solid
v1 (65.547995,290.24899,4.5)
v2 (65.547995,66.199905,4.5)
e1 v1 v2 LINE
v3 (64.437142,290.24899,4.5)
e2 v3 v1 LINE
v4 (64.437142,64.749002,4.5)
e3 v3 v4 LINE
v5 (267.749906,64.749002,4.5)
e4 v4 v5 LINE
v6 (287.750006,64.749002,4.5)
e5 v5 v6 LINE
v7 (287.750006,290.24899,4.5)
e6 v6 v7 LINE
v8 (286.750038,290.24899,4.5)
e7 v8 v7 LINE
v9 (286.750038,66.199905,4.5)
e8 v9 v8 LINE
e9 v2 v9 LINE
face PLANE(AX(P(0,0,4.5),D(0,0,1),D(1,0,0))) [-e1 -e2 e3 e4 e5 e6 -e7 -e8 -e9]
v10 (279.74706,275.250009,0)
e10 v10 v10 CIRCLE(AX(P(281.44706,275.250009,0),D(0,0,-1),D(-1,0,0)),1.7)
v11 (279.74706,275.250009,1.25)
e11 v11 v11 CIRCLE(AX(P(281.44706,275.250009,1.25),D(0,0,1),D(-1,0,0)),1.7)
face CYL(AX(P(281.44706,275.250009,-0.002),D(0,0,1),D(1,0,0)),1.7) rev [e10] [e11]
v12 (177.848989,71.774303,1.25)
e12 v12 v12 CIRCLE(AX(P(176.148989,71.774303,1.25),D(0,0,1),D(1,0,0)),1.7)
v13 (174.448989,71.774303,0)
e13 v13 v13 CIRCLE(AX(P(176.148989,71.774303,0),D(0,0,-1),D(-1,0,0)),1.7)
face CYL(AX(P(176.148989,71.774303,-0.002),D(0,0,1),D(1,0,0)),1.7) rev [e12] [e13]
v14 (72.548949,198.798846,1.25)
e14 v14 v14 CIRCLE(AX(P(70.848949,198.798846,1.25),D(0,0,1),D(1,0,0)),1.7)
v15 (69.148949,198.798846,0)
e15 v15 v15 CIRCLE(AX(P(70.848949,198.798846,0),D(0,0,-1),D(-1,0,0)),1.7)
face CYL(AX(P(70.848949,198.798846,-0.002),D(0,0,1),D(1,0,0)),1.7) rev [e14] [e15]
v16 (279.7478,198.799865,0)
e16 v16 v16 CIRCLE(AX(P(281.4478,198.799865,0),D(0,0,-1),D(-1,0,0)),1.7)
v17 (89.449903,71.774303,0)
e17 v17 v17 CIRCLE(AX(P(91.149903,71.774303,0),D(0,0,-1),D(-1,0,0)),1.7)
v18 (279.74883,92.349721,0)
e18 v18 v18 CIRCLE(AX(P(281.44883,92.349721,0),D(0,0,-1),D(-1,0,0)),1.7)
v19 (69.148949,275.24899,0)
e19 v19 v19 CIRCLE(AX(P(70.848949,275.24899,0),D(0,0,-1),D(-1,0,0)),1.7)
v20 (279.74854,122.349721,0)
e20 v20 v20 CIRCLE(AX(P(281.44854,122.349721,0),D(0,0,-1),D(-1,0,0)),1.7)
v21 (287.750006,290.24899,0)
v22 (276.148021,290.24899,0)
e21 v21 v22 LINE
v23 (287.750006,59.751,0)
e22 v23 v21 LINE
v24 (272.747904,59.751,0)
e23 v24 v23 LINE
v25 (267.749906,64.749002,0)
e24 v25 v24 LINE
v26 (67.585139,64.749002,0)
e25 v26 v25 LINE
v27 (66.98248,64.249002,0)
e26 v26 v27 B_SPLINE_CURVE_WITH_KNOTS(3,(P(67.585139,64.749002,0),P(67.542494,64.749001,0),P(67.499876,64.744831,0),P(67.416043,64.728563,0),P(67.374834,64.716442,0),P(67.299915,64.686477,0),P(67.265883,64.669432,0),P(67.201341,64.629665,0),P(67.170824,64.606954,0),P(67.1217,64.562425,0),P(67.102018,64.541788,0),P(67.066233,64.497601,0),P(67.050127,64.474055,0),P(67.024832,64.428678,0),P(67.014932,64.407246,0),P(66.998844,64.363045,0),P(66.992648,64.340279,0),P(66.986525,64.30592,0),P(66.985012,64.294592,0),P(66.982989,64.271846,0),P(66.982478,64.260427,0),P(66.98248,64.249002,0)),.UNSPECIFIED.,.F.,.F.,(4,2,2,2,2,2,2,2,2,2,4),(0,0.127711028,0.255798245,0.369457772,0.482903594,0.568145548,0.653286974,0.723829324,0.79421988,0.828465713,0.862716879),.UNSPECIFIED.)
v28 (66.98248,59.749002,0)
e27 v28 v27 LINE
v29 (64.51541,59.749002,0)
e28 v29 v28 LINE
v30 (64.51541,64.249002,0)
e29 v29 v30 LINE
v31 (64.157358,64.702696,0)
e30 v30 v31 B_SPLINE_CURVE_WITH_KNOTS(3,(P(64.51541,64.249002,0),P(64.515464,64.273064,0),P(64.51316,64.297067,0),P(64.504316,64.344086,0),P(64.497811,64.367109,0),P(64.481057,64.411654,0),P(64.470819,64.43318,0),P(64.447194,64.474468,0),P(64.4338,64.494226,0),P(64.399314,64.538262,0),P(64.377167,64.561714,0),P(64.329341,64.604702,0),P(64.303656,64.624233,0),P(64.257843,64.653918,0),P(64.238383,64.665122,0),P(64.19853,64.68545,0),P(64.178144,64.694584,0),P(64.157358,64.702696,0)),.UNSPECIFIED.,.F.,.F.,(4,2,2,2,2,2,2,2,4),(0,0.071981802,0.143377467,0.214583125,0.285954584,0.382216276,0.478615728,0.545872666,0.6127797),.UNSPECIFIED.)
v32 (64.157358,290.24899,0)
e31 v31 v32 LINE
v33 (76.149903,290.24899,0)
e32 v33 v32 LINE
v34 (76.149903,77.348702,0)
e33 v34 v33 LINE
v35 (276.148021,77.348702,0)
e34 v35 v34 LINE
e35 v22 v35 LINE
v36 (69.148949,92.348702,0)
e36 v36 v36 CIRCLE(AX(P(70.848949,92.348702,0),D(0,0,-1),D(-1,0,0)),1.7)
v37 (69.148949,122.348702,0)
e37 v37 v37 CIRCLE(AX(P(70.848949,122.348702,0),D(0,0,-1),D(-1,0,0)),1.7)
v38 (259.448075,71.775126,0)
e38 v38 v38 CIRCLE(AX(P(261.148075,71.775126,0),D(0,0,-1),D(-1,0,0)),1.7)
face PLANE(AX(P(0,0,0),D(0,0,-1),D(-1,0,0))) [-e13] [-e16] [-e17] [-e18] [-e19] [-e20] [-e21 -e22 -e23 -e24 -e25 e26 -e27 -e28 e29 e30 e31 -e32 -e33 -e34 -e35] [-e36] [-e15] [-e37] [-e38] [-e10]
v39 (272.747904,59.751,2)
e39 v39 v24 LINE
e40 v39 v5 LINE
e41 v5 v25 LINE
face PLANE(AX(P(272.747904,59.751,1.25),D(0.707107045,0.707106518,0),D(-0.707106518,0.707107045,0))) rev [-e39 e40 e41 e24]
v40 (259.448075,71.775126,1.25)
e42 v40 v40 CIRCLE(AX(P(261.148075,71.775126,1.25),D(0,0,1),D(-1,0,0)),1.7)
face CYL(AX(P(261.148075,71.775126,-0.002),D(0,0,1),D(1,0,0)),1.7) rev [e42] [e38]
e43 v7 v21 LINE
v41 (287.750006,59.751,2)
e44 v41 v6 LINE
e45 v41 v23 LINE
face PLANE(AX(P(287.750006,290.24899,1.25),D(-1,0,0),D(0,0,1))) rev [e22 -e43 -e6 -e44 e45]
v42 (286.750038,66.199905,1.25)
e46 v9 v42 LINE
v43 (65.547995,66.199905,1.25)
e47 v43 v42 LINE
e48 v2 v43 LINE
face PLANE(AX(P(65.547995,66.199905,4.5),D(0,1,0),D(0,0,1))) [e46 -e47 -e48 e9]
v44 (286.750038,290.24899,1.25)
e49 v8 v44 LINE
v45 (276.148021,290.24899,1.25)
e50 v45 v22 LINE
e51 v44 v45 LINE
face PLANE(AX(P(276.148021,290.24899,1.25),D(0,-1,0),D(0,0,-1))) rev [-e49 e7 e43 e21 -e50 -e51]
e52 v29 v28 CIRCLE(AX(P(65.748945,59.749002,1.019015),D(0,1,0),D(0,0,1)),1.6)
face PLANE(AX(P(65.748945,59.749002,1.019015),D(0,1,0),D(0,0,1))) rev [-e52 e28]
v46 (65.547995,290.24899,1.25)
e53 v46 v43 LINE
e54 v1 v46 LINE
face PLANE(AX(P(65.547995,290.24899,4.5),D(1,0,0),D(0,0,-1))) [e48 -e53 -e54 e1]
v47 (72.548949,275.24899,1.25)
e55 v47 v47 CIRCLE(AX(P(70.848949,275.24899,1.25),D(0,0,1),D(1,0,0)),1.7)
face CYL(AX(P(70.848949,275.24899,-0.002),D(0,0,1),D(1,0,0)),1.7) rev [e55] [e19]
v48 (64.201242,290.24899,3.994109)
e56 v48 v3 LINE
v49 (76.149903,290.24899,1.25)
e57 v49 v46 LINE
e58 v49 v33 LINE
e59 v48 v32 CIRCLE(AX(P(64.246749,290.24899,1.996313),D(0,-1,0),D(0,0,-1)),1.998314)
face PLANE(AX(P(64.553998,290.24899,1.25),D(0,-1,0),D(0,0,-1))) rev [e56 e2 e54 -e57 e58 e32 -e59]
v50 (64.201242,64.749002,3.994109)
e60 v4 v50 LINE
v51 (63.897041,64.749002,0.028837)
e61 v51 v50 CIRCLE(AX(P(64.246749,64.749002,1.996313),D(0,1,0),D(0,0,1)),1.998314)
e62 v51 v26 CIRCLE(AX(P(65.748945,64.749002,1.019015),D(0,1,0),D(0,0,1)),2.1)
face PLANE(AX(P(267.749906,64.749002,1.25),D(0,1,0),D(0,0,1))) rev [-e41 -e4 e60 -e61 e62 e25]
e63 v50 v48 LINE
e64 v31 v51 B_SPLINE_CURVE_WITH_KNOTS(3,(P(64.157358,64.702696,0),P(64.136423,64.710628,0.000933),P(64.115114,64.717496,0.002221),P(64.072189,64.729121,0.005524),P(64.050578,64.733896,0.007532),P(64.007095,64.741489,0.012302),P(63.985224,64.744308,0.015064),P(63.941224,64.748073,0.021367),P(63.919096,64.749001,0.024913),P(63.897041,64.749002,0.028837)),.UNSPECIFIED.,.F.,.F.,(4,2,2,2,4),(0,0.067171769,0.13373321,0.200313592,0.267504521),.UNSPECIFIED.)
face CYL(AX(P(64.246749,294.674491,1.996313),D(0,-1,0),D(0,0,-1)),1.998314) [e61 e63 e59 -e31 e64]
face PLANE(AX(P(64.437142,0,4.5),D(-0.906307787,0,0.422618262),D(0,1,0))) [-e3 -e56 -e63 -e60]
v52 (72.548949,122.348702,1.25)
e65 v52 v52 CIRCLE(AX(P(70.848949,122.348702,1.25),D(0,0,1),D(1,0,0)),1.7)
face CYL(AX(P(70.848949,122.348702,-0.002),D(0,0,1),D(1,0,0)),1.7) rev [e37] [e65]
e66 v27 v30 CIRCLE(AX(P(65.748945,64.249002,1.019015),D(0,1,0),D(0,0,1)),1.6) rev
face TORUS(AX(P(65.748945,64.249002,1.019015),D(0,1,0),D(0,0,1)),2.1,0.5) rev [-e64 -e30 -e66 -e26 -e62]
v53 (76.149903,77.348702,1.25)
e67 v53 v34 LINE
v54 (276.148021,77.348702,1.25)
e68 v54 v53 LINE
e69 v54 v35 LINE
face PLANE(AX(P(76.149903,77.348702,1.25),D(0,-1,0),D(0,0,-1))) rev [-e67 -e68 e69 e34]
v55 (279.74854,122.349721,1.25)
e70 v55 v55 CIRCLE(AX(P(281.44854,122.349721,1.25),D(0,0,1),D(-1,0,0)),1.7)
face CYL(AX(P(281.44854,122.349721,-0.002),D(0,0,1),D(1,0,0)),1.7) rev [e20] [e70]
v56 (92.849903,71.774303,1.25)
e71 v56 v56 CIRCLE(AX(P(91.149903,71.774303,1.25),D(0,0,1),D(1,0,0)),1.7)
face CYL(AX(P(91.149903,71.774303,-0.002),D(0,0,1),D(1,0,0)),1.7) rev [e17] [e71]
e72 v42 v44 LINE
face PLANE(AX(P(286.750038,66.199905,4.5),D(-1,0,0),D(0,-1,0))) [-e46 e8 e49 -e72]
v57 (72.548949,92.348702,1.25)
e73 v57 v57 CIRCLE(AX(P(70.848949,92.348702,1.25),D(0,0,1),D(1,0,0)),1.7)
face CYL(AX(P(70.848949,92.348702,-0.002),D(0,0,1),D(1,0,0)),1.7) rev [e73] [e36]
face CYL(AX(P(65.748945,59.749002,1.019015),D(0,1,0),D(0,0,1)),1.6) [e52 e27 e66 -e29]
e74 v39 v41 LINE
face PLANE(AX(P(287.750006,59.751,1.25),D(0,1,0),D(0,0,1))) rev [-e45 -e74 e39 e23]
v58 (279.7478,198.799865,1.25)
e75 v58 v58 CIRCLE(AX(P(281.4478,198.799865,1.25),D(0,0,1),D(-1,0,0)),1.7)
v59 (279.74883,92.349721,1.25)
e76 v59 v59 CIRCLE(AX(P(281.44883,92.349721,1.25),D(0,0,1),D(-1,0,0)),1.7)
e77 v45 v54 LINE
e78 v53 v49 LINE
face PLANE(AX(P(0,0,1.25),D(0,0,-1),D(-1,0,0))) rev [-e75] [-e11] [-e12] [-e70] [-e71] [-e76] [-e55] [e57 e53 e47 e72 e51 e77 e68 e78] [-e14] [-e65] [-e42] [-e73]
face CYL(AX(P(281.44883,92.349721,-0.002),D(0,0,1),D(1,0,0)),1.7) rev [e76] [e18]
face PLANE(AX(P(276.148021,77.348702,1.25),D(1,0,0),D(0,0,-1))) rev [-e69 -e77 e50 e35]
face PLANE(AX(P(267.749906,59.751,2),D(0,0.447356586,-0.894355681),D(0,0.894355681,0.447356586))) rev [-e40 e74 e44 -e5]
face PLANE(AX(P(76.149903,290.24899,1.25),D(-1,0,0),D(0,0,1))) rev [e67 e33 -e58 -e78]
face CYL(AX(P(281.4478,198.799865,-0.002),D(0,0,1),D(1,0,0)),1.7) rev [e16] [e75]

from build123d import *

# Parameters (mm, degrees)
SALIENTE_EXTRUIR1_DEPTH = 1.25
SALIENTE_EXTRUIR2_DEPTH = 3.25
SALIENTE_EXTRUIR3_DEPTH = 5
SALIENTE_EXTRUIR4_DEPTH = 225.499987602
SALIENTE_EXTRUIR6_REACH = 368.413
CROQUIS6_W              = 4.5
CROQUIS6_H              = 225.499987602
CHAFL_N1_SIZE           = 0.6
CHAFL_N1_SIZE_2         = 0.279784595
REDONDEO1_R             = 0.5
CORTAR_EXTRUIR1_REACH   = 369.581
CROQUIS8_R              = 1.7
CORTAR_EXTRUIR2_DEPTH   = 409.723751009


with BuildPart() as part:
    # Croquis1 → Saliente-Extruir1 (new body)
    with BuildSketch(Plane.XY):
        Polygon((287.750005722, 59.751000255), (272.747904062, 59.751000255), (267.749905586, 64.749002457), (64.157357861, 64.749002457), (64.553998411, 290.248990059), (76.149903238, 290.248990059), (76.149903238, 77.348701656), (276.148021221, 77.348701656), (276.148021221, 290.248990059), (287.750005722, 290.248990059), align=None)
    extrude(amount=SALIENTE_EXTRUIR1_DEPTH)

    # Croquis2 → Saliente-Extruir2 (add)
    with BuildSketch(Plane.XY.offset(1.25)):
        Polygon((286.75003751, 290.248990059), (287.750005722, 290.248990059), (287.750005722, 59.751000255), (272.747904062, 59.751000255), (267.749905586, 64.749002457), (64.157357861, 64.749002457), (64.553998411, 290.248990059), (65.547994841, 290.248990059), (65.547994841, 66.199905073), (286.75003751, 66.199905073), align=None)
    extrude(amount=SALIENTE_EXTRUIR2_DEPTH)

    # Croquis3 → Saliente-Extruir3 (add)
    with BuildSketch(Plane.XZ.offset(-64.749002457)):
        with BuildLine():
            Line((64.515409591, 0), (66.982480076, 0))
            ThreePointArc((66.982480076, 0), (65.748944833, 2.619014625), (64.515409591, 0))
        make_face()
    extrude(amount=SALIENTE_EXTRUIR3_DEPTH)

    # Saliente-Extruir6: up to this face of the body (flat: up to its plane)
    saliente_extruir6_end = Plane(part.part.faces().sort_by_distance((64.355678136, 177.498996258, 2.25))[0])
    # Croquis6 → Saliente-Extruir6 (add, up to the picked face)
    with BuildSketch(Plane(origin=(64.157357861, 0, 0), x_dir=(0, 0, -1), z_dir=(1, 0, 0)), mode=Mode.PRIVATE) as saliente_extruir6_sk1:
        with Locations((-2.25, 177.498996258)):
            Rectangle(CROQUIS6_W, CROQUIS6_H)
    saliente_extruir6_tool1 = split(extrude(saliente_extruir6_sk1.sketch, amount=SALIENTE_EXTRUIR6_REACH, mode=Mode.PRIVATE), bisect_by=saliente_extruir6_end, keep=Keep.BOTH, mode=Mode.PRIVATE)


with BuildPart() as body_2:
    # Croquis3<3> → Saliente-Extruir4 (new body)
    with BuildSketch(Plane.XZ.offset(-64.749002457)):
        with BuildLine():
            Line((64.157357861, 3.992626763), (64.157357861, 0))
            ThreePointArc((64.157357861, 0), (62.24843494, 1.996313381), (64.157357861, 3.992626763))
        make_face()
    extrude(amount=-SALIENTE_EXTRUIR4_DEPTH)


with BuildPart() as part_1:
    add(part.part)

    add(body_2.part)  # Saliente-Extruir6 merges body 2
    add(saliente_extruir6_tool1.solids().sort_by(Axis((64.157358, 177.498996, 2.25), (1, 0, 0)))[0])

    # Chaflán1
    # the kernel refuses this chamfer: 0.6, 0.279784595 mm, written as the material it takes off along each edge
    with BuildSketch(Plane(origin=(64.157357861, 63.194417174, 4.5), x_dir=(-0.016311164131115618, 0, -0.9998669641130703), z_dir=(0, 1, 0))) as chafl_n1_piece_1_section:
        Polygon((CHAFL_N1_SIZE * 0.999866964113, -CHAFL_N1_SIZE * 0.0163111641311), (-CHAFL_N1_SIZE_2 * 0.0163111641249, -CHAFL_N1_SIZE_2 * 0.999866963731), (0, 0), align=None)
    chafl_n1_piece_1 = extrude(amount=228.609158168, mode=Mode.PRIVATE)
    chafl_n1_piece_1 = chafl_n1_piece_1 - Plane(origin=(64.246748688, 177.498996258, 1.996313381), x_dir=(-0.044733129364357686, 0, -0.9989989725406486), z_dir=(0, -1, 0)) * Cylinder(1.998313748, 460, mode=Mode.PRIVATE)
    add(chafl_n1_piece_1, mode=Mode.SUBTRACT)

    # Redondeo1
    redondeo1_edges = [part_1.edges().sort_by_distance(p)[0] for p in [
        (65.748944833, 64.749002457, 2.619014625),
    ]]
    fillet(redondeo1_edges, radius=REDONDEO1_R)

    # Cortar-Extruir1: up to this plane
    cortar_extruir1_end = Plane(origin=(272.747904062, 59.751000255, 1.25), z_dir=(0.7071070447096931, 0.7071065176633039, 0))
    # Croquis7 → Cortar-Extruir1 (cut, up to the surface)
    with BuildSketch(Plane(origin=(287.750005722, 0, 0), x_dir=(0, 0, -1), z_dir=(1, 0, 0)), mode=Mode.PRIVATE) as cortar_extruir1_sk1:
        Polygon((-2, 59.751000255), (-4.5, 64.749002457), (-4.5, 59.751000255), align=None)
    cortar_extruir1_tool1 = split(extrude(cortar_extruir1_sk1.sketch, amount=-CORTAR_EXTRUIR1_REACH, mode=Mode.PRIVATE), bisect_by=cortar_extruir1_end, keep=Keep.BOTH, mode=Mode.PRIVATE)
    add(cortar_extruir1_tool1.solids().sort_by_distance((287.750006, 61.417001, 3.666667))[0], mode=Mode.SUBTRACT)

    # Croquis8 → Cortar-Extruir2 (cut, through all)
    with BuildSketch(Plane.XY.offset(1.25)):
        with Locations((176.148989202, 71.774303364)):
            Circle(CROQUIS8_R)
        with Locations((91.149903238, 71.774303364)):
            Circle(CROQUIS8_R)
        with Locations(Location((261.148075163, 71.775125937, 0), (0, 0, 180))):
            Circle(CROQUIS8_R)
        with Locations((70.848949039, 92.348701656)):
            Circle(CROQUIS8_R)
        with Locations((70.848949039, 122.348701656)):
            Circle(CROQUIS8_R)
        with Locations((70.848949039, 275.248990059)):
            Circle(CROQUIS8_R)
        with Locations((70.848949039, 198.798845857)):
            Circle(CROQUIS8_R)
        with Locations(Location((281.44853993, 122.349720687, 0), (0, 0, 180))):
            Circle(CROQUIS8_R)
        with Locations(Location((281.447800089, 198.799864885, 0), (0, 0, 180))):
            Circle(CROQUIS8_R)
        with Locations(Location((281.447060248, 275.250009083, 0), (0, 0, 180))):
            Circle(CROQUIS8_R)
        with Locations(Location((281.448830253, 92.349720689, 0), (0, 0, 180))):
            Circle(CROQUIS8_R)
    extrude(amount=-CORTAR_EXTRUIR2_DEPTH, mode=Mode.SUBTRACT)


solid = part_1.part
